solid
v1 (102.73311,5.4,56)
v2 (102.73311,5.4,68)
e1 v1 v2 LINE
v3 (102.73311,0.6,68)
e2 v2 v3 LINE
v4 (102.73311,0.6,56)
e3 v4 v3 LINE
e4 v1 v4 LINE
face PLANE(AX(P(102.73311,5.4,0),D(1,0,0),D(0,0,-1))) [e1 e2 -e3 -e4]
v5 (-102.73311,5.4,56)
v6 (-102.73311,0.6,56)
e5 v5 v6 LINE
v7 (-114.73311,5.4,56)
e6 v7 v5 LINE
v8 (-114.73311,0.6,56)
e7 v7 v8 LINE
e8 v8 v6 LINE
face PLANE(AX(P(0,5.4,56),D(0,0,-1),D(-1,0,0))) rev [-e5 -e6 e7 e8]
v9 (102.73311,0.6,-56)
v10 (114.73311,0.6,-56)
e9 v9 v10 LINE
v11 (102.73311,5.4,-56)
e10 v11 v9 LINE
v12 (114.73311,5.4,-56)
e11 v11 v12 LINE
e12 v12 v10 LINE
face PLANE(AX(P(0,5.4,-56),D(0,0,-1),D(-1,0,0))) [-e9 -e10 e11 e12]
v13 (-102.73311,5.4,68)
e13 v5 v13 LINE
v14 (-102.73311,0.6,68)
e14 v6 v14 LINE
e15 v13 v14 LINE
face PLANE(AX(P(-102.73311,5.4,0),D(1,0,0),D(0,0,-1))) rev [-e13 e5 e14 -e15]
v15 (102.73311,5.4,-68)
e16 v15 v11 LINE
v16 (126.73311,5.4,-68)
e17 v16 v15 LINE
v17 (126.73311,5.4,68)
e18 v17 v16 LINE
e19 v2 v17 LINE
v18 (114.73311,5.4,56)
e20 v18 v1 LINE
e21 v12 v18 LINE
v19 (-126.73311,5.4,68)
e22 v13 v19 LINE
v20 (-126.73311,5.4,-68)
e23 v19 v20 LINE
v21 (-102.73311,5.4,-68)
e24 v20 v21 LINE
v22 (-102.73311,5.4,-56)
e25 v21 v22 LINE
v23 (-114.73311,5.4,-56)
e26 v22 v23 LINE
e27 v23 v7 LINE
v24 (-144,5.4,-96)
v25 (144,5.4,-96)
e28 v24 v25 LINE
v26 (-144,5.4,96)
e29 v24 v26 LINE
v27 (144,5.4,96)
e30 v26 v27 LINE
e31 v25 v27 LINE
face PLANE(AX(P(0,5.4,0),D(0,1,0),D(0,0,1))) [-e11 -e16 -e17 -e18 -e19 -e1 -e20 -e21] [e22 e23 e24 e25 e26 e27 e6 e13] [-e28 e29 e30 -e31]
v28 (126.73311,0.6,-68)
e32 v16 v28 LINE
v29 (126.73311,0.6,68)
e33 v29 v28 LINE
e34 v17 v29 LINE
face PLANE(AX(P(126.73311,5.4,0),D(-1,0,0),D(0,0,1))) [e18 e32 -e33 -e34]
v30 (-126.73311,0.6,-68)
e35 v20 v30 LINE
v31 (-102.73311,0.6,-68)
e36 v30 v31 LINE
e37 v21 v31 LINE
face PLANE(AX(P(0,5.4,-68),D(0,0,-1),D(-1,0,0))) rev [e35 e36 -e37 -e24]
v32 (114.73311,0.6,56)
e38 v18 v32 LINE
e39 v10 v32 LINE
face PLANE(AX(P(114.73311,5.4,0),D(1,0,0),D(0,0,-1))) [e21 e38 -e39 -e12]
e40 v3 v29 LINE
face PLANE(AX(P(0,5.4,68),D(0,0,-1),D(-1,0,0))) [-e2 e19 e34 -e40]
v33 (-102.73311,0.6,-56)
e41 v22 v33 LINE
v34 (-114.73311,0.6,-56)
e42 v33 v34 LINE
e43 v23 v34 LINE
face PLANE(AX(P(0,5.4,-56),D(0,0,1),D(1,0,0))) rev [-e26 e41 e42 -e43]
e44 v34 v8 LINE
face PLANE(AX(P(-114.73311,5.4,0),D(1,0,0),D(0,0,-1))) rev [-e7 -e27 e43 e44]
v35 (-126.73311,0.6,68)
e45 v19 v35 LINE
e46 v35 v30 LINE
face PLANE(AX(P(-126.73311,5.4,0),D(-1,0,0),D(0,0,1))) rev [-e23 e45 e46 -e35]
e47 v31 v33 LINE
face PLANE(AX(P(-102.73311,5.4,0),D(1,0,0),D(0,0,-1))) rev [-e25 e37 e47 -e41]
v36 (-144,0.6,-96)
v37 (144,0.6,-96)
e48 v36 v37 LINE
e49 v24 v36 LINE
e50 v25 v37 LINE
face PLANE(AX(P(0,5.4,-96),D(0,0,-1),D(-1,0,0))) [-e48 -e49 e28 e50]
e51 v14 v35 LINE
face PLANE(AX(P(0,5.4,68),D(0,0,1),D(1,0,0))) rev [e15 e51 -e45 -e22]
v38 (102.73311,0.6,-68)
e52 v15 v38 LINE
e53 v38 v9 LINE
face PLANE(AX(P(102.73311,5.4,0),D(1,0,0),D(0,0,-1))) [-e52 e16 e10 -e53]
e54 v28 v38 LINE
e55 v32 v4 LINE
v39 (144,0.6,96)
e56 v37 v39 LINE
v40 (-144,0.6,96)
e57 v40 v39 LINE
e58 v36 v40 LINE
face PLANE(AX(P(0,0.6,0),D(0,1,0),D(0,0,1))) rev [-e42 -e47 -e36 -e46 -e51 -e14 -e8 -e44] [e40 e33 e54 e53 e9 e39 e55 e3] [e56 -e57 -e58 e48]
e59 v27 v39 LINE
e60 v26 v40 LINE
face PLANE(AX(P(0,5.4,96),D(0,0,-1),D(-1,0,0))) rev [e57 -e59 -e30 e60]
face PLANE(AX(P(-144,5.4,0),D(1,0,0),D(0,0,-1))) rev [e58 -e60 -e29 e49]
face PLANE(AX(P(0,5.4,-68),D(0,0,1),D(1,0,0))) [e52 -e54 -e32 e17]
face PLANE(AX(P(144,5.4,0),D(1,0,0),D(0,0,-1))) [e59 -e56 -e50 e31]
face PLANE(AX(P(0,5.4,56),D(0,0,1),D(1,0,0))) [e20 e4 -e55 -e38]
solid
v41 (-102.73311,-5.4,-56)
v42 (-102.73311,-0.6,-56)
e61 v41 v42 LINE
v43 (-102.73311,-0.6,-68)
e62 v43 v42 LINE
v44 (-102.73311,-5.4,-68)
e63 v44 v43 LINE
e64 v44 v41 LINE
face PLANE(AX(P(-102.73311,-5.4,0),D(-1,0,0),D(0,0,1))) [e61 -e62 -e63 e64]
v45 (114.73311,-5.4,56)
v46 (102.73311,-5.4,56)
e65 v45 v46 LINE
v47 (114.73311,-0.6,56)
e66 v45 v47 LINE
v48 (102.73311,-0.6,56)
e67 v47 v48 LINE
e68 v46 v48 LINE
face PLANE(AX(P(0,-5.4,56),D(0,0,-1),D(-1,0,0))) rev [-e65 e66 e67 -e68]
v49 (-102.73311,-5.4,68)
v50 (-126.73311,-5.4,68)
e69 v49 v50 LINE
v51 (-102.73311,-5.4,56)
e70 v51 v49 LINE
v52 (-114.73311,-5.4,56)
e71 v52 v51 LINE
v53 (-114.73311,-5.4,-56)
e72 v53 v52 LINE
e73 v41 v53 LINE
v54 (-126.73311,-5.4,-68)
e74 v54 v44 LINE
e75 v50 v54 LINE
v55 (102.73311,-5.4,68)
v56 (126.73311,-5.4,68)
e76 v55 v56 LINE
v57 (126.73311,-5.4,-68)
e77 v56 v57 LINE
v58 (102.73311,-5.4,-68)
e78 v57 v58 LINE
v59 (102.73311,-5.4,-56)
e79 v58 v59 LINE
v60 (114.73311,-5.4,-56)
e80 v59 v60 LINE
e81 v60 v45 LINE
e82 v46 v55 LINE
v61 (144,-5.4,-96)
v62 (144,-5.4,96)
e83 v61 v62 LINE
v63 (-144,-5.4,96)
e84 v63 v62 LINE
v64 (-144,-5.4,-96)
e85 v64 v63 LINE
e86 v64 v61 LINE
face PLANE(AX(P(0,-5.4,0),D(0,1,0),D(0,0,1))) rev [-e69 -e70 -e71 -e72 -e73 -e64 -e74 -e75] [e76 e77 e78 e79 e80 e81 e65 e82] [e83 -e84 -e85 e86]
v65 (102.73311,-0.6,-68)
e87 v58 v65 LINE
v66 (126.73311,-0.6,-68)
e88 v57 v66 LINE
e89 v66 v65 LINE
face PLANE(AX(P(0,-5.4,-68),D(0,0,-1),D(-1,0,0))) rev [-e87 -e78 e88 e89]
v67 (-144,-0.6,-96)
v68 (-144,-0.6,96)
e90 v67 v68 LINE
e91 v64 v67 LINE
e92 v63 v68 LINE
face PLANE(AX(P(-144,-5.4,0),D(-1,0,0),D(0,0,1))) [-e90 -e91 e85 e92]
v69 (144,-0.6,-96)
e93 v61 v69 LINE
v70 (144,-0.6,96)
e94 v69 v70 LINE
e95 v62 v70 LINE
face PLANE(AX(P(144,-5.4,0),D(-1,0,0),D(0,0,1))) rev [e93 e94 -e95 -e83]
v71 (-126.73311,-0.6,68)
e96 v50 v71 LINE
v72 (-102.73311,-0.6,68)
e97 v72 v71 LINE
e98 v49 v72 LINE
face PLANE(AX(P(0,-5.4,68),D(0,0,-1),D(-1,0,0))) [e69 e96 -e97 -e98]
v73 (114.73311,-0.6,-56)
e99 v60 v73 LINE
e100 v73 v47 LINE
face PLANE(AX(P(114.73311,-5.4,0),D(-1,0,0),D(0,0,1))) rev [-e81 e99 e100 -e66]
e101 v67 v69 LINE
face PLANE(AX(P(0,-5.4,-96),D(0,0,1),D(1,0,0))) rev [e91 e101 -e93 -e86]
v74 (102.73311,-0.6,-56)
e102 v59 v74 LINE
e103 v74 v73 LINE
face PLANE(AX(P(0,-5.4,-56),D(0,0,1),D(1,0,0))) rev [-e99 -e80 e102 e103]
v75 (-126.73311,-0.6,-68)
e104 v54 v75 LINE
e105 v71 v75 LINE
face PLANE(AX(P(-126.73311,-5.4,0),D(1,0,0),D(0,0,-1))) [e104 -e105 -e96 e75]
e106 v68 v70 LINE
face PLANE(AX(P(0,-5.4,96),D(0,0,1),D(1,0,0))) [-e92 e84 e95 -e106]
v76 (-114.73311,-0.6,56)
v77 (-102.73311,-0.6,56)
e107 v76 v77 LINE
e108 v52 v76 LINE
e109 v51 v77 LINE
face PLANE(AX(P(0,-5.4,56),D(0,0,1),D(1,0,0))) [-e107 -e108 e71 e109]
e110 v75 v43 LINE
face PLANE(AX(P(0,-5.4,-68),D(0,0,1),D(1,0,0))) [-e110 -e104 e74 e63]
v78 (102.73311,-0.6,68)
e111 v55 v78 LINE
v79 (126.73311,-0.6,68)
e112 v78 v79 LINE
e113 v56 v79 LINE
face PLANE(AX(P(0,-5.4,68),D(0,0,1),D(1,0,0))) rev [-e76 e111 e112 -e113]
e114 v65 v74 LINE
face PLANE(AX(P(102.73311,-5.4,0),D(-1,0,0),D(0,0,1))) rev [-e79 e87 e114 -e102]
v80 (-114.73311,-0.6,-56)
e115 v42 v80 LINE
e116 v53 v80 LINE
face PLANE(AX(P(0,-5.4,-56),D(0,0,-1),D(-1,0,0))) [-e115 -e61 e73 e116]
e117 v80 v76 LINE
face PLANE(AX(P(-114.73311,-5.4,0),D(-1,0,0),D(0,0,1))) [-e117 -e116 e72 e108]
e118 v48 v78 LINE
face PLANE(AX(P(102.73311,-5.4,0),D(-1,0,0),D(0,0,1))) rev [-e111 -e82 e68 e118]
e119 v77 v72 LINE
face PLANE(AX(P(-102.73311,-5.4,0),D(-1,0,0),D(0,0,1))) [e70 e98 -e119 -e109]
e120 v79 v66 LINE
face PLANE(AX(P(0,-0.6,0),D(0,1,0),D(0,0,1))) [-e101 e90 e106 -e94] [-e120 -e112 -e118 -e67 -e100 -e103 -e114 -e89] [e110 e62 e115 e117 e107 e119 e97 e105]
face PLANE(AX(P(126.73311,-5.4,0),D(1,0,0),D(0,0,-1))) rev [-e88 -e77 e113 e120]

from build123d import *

# Parameters (mm, degrees)
SKETCH1_W           = 360
SKETCH1_H           = 240
BOSS_EXTRUDE1_DEPTH = 6
SKETCH1_3_W         = 360
SKETCH1_3_H         = 240
BOSS_EXTRUDE2_DEPTH = 6
SCALE1_START        = -120
SCALE1_OUTLINE_W    = 360
SCALE1_OUTLINE_H    = 12
SCALE1_OUTLINE_W_2  = 288
SCALE1_OUTLINE_H_2  = 4.8
SCALE1_DEPTH        = 240
SCALE1_2_OUTLINE_W  = 288
SCALE1_2_OUTLINE_H  = 4.8
SCALE1_2_DEPTH      = 24
SCALE1_START_2      = 96
SCALE1_3_OUTLINE_W  = 288
SCALE1_3_OUTLINE_H  = 4.8
SCALE1_3_DEPTH      = 24
SCALE1_START_3      = -68
SCALE1_4_OUTLINE_W  = 12
SCALE1_4_OUTLINE_H  = 4.8
SCALE1_4_DEPTH      = 136
SCALE1_5_OUTLINE_W  = 12
SCALE1_5_OUTLINE_H  = 4.8
SCALE1_5_DEPTH      = 12
SCALE1_START_4      = 56
SCALE1_6_OUTLINE_W  = 12
SCALE1_6_OUTLINE_H  = 4.8
SCALE1_6_DEPTH      = 12
SCALE1_START_5      = -85
SCALE1_7_OUTLINE_W  = 15.583612779
SCALE1_7_OUTLINE_H  = 4.8
SCALE1_7_DEPTH      = 170


# Read off the part's stored shape, not the designer's step: Scale1
with BuildPart() as part:
    # Sketch1 → Boss-Extrude1 (new body)
    with BuildSketch(Plane(origin=(0, 0, 0), x_dir=(1, 0, 0), z_dir=(0, 1, 0))):
        Rectangle(SKETCH1_W, SKETCH1_H)
        Polygon((-158.416387221, 85), (-128.416387221, 85), (-128.416387221, 70), (-143.416387221, 70), (-143.416387221, -70), (-128.416387221, -70), (-128.416387221, -85), (-158.416387221, -85), align=None, mode=Mode.SUBTRACT)
        Polygon((128.416387221, -70), (128.416387221, -85), (158.416387221, -85), (158.416387221, 85), (128.416387221, 85), (128.416387221, 70), (143.416387221, 70), (143.416387221, -70), align=None, mode=Mode.SUBTRACT)
    extrude(amount=BOSS_EXTRUDE1_DEPTH)


with BuildPart() as body_2:
    # Sketch1<3> → Boss-Extrude2 (new body)
    with BuildSketch(Plane(origin=(0, 0, 0), x_dir=(1, 0, 0), z_dir=(0, 1, 0))):
        Rectangle(SKETCH1_3_W, SKETCH1_3_H)
        Polygon((-158.416387221, 85), (-128.416387221, 85), (-128.416387221, 70), (-143.416387221, 70), (-143.416387221, -70), (-128.416387221, -70), (-128.416387221, -85), (-158.416387221, -85), align=None, mode=Mode.SUBTRACT)
        Polygon((128.416387221, -70), (128.416387221, -85), (158.416387221, -85), (158.416387221, 85), (128.416387221, 85), (128.416387221, 70), (143.416387221, 70), (143.416387221, -70), align=None, mode=Mode.SUBTRACT)
    extrude(amount=-BOSS_EXTRUDE2_DEPTH)


with BuildPart() as scale1_tool:
    # Scale1 outline → Scale1 (new body)
    with BuildSketch(Plane.XY.offset(SCALE1_START)):
        Rectangle(SCALE1_OUTLINE_W, SCALE1_OUTLINE_H)
        with Locations((0, 3)):
            Rectangle(SCALE1_OUTLINE_W_2, SCALE1_OUTLINE_H_2, mode=Mode.SUBTRACT)
        with Locations((0, -3)):
            Rectangle(SCALE1_OUTLINE_W_2, SCALE1_OUTLINE_H_2, mode=Mode.SUBTRACT)
    extrude(amount=SCALE1_DEPTH)


with BuildPart() as part_1:
    add(part.part)

    # Scale1: cut by scale1_tool
    add(scale1_tool.part, mode=Mode.SUBTRACT)


with BuildPart() as body_2_1:
    add(body_2.part)

    # Scale1: cut by scale1_tool
    add(scale1_tool.part, mode=Mode.SUBTRACT)


with BuildPart() as scale1_2_tool:
    # Scale1 2 outline → Scale1 2 (new body)
    with BuildSketch(Plane.XY.offset(SCALE1_START)):
        with Locations((0, 3)):
            Rectangle(SCALE1_2_OUTLINE_W, SCALE1_2_OUTLINE_H)
        with Locations((0, -3)):
            Rectangle(SCALE1_2_OUTLINE_W, SCALE1_2_OUTLINE_H)
    extrude(amount=SCALE1_2_DEPTH)


with BuildPart() as part_2:
    add(part_1.part)

    # Scale1 2: cut by scale1_2_tool
    add(scale1_2_tool.part, mode=Mode.SUBTRACT)


with BuildPart() as body_2_2:
    add(body_2_1.part)

    # Scale1 2: cut by scale1_2_tool
    add(scale1_2_tool.part, mode=Mode.SUBTRACT)


with BuildPart() as scale1_3_tool:
    # Scale1 3 outline → Scale1 3 (new body)
    with BuildSketch(Plane.XY.offset(SCALE1_START_2)):
        with Locations((0, 3)):
            Rectangle(SCALE1_3_OUTLINE_W, SCALE1_3_OUTLINE_H)
        with Locations((0, -3)):
            Rectangle(SCALE1_3_OUTLINE_W, SCALE1_3_OUTLINE_H)
    extrude(amount=SCALE1_3_DEPTH)


with BuildPart() as part_3:
    add(part_2.part)

    # Scale1 3: cut by scale1_3_tool
    add(scale1_3_tool.part, mode=Mode.SUBTRACT)


with BuildPart() as body_2_3:
    add(body_2_2.part)

    # Scale1 3: cut by scale1_3_tool
    add(scale1_3_tool.part, mode=Mode.SUBTRACT)


with BuildPart() as scale1_4_tool:
    # Scale1 4 outline → Scale1 4 (new body)
    with BuildSketch(Plane.XY.offset(SCALE1_START_3)):
        with Locations((-120.733109777, 3)):
            Rectangle(SCALE1_4_OUTLINE_W, SCALE1_4_OUTLINE_H)
        with Locations((120.733109777, 3)):
            Rectangle(SCALE1_4_OUTLINE_W, SCALE1_4_OUTLINE_H)
        with Locations((-120.733109777, -3)):
            Rectangle(SCALE1_4_OUTLINE_W, SCALE1_4_OUTLINE_H)
        with Locations((120.733109777, -3)):
            Rectangle(SCALE1_4_OUTLINE_W, SCALE1_4_OUTLINE_H)
    extrude(amount=SCALE1_4_DEPTH)


with BuildPart() as part_4:
    add(part_3.part)

    # Scale1 4: cut by scale1_4_tool
    add(scale1_4_tool.part, mode=Mode.SUBTRACT)


with BuildPart() as body_2_4:
    add(body_2_3.part)

    # Scale1 4: cut by scale1_4_tool
    add(scale1_4_tool.part, mode=Mode.SUBTRACT)


with BuildPart() as scale1_5_tool:
    # Scale1 5 outline → Scale1 5 (new body)
    with BuildSketch(Plane.XY.offset(SCALE1_START_3)):
        with Locations((-108.733109777, 3)):
            Rectangle(SCALE1_5_OUTLINE_W, SCALE1_5_OUTLINE_H)
        with Locations((108.733109777, 3)):
            Rectangle(SCALE1_5_OUTLINE_W, SCALE1_5_OUTLINE_H)
        with Locations((-108.733109777, -3)):
            Rectangle(SCALE1_5_OUTLINE_W, SCALE1_5_OUTLINE_H)
        with Locations((108.733109777, -3)):
            Rectangle(SCALE1_5_OUTLINE_W, SCALE1_5_OUTLINE_H)
    extrude(amount=SCALE1_5_DEPTH)


with BuildPart() as part_5:
    add(part_4.part)

    # Scale1 5: cut by scale1_5_tool
    add(scale1_5_tool.part, mode=Mode.SUBTRACT)


with BuildPart() as body_2_5:
    add(body_2_4.part)

    # Scale1 5: cut by scale1_5_tool
    add(scale1_5_tool.part, mode=Mode.SUBTRACT)


with BuildPart() as scale1_6_tool:
    # Scale1 6 outline → Scale1 6 (new body)
    with BuildSketch(Plane.XY.offset(SCALE1_START_4)):
        with Locations((-108.733109777, 3)):
            Rectangle(SCALE1_6_OUTLINE_W, SCALE1_6_OUTLINE_H)
        with Locations((108.733109777, 3)):
            Rectangle(SCALE1_6_OUTLINE_W, SCALE1_6_OUTLINE_H)
        with Locations((-108.733109777, -3)):
            Rectangle(SCALE1_6_OUTLINE_W, SCALE1_6_OUTLINE_H)
        with Locations((108.733109777, -3)):
            Rectangle(SCALE1_6_OUTLINE_W, SCALE1_6_OUTLINE_H)
    extrude(amount=SCALE1_6_DEPTH)


with BuildPart() as part_6:
    add(part_5.part)

    # Scale1 6: cut by scale1_6_tool
    add(scale1_6_tool.part, mode=Mode.SUBTRACT)



with BuildPart() as body_2_6:
    add(body_2_5.part)

    # Scale1 6: cut by scale1_6_tool
    add(scale1_6_tool.part, mode=Mode.SUBTRACT)


with BuildPart() as part_7:
    add(part_6.part)

    add(body_2_6.part)  # Scale1 7 merges body 2
    # Scale1 7 outline → Scale1 7 (add)
    with BuildSketch(Plane.XY.offset(SCALE1_START_5)):
        with Locations((-136.208193611, 3)):
            Rectangle(SCALE1_7_OUTLINE_W, SCALE1_7_OUTLINE_H)
        with Locations((136.208193611, 3)):
            Rectangle(SCALE1_7_OUTLINE_W, SCALE1_7_OUTLINE_H)
        with Locations((-136.208193611, -3)):
            Rectangle(SCALE1_7_OUTLINE_W, SCALE1_7_OUTLINE_H)
        with Locations((136.208193611, -3)):
            Rectangle(SCALE1_7_OUTLINE_W, SCALE1_7_OUTLINE_H)
    extrude(amount=SCALE1_7_DEPTH)


solid = part_7.part
